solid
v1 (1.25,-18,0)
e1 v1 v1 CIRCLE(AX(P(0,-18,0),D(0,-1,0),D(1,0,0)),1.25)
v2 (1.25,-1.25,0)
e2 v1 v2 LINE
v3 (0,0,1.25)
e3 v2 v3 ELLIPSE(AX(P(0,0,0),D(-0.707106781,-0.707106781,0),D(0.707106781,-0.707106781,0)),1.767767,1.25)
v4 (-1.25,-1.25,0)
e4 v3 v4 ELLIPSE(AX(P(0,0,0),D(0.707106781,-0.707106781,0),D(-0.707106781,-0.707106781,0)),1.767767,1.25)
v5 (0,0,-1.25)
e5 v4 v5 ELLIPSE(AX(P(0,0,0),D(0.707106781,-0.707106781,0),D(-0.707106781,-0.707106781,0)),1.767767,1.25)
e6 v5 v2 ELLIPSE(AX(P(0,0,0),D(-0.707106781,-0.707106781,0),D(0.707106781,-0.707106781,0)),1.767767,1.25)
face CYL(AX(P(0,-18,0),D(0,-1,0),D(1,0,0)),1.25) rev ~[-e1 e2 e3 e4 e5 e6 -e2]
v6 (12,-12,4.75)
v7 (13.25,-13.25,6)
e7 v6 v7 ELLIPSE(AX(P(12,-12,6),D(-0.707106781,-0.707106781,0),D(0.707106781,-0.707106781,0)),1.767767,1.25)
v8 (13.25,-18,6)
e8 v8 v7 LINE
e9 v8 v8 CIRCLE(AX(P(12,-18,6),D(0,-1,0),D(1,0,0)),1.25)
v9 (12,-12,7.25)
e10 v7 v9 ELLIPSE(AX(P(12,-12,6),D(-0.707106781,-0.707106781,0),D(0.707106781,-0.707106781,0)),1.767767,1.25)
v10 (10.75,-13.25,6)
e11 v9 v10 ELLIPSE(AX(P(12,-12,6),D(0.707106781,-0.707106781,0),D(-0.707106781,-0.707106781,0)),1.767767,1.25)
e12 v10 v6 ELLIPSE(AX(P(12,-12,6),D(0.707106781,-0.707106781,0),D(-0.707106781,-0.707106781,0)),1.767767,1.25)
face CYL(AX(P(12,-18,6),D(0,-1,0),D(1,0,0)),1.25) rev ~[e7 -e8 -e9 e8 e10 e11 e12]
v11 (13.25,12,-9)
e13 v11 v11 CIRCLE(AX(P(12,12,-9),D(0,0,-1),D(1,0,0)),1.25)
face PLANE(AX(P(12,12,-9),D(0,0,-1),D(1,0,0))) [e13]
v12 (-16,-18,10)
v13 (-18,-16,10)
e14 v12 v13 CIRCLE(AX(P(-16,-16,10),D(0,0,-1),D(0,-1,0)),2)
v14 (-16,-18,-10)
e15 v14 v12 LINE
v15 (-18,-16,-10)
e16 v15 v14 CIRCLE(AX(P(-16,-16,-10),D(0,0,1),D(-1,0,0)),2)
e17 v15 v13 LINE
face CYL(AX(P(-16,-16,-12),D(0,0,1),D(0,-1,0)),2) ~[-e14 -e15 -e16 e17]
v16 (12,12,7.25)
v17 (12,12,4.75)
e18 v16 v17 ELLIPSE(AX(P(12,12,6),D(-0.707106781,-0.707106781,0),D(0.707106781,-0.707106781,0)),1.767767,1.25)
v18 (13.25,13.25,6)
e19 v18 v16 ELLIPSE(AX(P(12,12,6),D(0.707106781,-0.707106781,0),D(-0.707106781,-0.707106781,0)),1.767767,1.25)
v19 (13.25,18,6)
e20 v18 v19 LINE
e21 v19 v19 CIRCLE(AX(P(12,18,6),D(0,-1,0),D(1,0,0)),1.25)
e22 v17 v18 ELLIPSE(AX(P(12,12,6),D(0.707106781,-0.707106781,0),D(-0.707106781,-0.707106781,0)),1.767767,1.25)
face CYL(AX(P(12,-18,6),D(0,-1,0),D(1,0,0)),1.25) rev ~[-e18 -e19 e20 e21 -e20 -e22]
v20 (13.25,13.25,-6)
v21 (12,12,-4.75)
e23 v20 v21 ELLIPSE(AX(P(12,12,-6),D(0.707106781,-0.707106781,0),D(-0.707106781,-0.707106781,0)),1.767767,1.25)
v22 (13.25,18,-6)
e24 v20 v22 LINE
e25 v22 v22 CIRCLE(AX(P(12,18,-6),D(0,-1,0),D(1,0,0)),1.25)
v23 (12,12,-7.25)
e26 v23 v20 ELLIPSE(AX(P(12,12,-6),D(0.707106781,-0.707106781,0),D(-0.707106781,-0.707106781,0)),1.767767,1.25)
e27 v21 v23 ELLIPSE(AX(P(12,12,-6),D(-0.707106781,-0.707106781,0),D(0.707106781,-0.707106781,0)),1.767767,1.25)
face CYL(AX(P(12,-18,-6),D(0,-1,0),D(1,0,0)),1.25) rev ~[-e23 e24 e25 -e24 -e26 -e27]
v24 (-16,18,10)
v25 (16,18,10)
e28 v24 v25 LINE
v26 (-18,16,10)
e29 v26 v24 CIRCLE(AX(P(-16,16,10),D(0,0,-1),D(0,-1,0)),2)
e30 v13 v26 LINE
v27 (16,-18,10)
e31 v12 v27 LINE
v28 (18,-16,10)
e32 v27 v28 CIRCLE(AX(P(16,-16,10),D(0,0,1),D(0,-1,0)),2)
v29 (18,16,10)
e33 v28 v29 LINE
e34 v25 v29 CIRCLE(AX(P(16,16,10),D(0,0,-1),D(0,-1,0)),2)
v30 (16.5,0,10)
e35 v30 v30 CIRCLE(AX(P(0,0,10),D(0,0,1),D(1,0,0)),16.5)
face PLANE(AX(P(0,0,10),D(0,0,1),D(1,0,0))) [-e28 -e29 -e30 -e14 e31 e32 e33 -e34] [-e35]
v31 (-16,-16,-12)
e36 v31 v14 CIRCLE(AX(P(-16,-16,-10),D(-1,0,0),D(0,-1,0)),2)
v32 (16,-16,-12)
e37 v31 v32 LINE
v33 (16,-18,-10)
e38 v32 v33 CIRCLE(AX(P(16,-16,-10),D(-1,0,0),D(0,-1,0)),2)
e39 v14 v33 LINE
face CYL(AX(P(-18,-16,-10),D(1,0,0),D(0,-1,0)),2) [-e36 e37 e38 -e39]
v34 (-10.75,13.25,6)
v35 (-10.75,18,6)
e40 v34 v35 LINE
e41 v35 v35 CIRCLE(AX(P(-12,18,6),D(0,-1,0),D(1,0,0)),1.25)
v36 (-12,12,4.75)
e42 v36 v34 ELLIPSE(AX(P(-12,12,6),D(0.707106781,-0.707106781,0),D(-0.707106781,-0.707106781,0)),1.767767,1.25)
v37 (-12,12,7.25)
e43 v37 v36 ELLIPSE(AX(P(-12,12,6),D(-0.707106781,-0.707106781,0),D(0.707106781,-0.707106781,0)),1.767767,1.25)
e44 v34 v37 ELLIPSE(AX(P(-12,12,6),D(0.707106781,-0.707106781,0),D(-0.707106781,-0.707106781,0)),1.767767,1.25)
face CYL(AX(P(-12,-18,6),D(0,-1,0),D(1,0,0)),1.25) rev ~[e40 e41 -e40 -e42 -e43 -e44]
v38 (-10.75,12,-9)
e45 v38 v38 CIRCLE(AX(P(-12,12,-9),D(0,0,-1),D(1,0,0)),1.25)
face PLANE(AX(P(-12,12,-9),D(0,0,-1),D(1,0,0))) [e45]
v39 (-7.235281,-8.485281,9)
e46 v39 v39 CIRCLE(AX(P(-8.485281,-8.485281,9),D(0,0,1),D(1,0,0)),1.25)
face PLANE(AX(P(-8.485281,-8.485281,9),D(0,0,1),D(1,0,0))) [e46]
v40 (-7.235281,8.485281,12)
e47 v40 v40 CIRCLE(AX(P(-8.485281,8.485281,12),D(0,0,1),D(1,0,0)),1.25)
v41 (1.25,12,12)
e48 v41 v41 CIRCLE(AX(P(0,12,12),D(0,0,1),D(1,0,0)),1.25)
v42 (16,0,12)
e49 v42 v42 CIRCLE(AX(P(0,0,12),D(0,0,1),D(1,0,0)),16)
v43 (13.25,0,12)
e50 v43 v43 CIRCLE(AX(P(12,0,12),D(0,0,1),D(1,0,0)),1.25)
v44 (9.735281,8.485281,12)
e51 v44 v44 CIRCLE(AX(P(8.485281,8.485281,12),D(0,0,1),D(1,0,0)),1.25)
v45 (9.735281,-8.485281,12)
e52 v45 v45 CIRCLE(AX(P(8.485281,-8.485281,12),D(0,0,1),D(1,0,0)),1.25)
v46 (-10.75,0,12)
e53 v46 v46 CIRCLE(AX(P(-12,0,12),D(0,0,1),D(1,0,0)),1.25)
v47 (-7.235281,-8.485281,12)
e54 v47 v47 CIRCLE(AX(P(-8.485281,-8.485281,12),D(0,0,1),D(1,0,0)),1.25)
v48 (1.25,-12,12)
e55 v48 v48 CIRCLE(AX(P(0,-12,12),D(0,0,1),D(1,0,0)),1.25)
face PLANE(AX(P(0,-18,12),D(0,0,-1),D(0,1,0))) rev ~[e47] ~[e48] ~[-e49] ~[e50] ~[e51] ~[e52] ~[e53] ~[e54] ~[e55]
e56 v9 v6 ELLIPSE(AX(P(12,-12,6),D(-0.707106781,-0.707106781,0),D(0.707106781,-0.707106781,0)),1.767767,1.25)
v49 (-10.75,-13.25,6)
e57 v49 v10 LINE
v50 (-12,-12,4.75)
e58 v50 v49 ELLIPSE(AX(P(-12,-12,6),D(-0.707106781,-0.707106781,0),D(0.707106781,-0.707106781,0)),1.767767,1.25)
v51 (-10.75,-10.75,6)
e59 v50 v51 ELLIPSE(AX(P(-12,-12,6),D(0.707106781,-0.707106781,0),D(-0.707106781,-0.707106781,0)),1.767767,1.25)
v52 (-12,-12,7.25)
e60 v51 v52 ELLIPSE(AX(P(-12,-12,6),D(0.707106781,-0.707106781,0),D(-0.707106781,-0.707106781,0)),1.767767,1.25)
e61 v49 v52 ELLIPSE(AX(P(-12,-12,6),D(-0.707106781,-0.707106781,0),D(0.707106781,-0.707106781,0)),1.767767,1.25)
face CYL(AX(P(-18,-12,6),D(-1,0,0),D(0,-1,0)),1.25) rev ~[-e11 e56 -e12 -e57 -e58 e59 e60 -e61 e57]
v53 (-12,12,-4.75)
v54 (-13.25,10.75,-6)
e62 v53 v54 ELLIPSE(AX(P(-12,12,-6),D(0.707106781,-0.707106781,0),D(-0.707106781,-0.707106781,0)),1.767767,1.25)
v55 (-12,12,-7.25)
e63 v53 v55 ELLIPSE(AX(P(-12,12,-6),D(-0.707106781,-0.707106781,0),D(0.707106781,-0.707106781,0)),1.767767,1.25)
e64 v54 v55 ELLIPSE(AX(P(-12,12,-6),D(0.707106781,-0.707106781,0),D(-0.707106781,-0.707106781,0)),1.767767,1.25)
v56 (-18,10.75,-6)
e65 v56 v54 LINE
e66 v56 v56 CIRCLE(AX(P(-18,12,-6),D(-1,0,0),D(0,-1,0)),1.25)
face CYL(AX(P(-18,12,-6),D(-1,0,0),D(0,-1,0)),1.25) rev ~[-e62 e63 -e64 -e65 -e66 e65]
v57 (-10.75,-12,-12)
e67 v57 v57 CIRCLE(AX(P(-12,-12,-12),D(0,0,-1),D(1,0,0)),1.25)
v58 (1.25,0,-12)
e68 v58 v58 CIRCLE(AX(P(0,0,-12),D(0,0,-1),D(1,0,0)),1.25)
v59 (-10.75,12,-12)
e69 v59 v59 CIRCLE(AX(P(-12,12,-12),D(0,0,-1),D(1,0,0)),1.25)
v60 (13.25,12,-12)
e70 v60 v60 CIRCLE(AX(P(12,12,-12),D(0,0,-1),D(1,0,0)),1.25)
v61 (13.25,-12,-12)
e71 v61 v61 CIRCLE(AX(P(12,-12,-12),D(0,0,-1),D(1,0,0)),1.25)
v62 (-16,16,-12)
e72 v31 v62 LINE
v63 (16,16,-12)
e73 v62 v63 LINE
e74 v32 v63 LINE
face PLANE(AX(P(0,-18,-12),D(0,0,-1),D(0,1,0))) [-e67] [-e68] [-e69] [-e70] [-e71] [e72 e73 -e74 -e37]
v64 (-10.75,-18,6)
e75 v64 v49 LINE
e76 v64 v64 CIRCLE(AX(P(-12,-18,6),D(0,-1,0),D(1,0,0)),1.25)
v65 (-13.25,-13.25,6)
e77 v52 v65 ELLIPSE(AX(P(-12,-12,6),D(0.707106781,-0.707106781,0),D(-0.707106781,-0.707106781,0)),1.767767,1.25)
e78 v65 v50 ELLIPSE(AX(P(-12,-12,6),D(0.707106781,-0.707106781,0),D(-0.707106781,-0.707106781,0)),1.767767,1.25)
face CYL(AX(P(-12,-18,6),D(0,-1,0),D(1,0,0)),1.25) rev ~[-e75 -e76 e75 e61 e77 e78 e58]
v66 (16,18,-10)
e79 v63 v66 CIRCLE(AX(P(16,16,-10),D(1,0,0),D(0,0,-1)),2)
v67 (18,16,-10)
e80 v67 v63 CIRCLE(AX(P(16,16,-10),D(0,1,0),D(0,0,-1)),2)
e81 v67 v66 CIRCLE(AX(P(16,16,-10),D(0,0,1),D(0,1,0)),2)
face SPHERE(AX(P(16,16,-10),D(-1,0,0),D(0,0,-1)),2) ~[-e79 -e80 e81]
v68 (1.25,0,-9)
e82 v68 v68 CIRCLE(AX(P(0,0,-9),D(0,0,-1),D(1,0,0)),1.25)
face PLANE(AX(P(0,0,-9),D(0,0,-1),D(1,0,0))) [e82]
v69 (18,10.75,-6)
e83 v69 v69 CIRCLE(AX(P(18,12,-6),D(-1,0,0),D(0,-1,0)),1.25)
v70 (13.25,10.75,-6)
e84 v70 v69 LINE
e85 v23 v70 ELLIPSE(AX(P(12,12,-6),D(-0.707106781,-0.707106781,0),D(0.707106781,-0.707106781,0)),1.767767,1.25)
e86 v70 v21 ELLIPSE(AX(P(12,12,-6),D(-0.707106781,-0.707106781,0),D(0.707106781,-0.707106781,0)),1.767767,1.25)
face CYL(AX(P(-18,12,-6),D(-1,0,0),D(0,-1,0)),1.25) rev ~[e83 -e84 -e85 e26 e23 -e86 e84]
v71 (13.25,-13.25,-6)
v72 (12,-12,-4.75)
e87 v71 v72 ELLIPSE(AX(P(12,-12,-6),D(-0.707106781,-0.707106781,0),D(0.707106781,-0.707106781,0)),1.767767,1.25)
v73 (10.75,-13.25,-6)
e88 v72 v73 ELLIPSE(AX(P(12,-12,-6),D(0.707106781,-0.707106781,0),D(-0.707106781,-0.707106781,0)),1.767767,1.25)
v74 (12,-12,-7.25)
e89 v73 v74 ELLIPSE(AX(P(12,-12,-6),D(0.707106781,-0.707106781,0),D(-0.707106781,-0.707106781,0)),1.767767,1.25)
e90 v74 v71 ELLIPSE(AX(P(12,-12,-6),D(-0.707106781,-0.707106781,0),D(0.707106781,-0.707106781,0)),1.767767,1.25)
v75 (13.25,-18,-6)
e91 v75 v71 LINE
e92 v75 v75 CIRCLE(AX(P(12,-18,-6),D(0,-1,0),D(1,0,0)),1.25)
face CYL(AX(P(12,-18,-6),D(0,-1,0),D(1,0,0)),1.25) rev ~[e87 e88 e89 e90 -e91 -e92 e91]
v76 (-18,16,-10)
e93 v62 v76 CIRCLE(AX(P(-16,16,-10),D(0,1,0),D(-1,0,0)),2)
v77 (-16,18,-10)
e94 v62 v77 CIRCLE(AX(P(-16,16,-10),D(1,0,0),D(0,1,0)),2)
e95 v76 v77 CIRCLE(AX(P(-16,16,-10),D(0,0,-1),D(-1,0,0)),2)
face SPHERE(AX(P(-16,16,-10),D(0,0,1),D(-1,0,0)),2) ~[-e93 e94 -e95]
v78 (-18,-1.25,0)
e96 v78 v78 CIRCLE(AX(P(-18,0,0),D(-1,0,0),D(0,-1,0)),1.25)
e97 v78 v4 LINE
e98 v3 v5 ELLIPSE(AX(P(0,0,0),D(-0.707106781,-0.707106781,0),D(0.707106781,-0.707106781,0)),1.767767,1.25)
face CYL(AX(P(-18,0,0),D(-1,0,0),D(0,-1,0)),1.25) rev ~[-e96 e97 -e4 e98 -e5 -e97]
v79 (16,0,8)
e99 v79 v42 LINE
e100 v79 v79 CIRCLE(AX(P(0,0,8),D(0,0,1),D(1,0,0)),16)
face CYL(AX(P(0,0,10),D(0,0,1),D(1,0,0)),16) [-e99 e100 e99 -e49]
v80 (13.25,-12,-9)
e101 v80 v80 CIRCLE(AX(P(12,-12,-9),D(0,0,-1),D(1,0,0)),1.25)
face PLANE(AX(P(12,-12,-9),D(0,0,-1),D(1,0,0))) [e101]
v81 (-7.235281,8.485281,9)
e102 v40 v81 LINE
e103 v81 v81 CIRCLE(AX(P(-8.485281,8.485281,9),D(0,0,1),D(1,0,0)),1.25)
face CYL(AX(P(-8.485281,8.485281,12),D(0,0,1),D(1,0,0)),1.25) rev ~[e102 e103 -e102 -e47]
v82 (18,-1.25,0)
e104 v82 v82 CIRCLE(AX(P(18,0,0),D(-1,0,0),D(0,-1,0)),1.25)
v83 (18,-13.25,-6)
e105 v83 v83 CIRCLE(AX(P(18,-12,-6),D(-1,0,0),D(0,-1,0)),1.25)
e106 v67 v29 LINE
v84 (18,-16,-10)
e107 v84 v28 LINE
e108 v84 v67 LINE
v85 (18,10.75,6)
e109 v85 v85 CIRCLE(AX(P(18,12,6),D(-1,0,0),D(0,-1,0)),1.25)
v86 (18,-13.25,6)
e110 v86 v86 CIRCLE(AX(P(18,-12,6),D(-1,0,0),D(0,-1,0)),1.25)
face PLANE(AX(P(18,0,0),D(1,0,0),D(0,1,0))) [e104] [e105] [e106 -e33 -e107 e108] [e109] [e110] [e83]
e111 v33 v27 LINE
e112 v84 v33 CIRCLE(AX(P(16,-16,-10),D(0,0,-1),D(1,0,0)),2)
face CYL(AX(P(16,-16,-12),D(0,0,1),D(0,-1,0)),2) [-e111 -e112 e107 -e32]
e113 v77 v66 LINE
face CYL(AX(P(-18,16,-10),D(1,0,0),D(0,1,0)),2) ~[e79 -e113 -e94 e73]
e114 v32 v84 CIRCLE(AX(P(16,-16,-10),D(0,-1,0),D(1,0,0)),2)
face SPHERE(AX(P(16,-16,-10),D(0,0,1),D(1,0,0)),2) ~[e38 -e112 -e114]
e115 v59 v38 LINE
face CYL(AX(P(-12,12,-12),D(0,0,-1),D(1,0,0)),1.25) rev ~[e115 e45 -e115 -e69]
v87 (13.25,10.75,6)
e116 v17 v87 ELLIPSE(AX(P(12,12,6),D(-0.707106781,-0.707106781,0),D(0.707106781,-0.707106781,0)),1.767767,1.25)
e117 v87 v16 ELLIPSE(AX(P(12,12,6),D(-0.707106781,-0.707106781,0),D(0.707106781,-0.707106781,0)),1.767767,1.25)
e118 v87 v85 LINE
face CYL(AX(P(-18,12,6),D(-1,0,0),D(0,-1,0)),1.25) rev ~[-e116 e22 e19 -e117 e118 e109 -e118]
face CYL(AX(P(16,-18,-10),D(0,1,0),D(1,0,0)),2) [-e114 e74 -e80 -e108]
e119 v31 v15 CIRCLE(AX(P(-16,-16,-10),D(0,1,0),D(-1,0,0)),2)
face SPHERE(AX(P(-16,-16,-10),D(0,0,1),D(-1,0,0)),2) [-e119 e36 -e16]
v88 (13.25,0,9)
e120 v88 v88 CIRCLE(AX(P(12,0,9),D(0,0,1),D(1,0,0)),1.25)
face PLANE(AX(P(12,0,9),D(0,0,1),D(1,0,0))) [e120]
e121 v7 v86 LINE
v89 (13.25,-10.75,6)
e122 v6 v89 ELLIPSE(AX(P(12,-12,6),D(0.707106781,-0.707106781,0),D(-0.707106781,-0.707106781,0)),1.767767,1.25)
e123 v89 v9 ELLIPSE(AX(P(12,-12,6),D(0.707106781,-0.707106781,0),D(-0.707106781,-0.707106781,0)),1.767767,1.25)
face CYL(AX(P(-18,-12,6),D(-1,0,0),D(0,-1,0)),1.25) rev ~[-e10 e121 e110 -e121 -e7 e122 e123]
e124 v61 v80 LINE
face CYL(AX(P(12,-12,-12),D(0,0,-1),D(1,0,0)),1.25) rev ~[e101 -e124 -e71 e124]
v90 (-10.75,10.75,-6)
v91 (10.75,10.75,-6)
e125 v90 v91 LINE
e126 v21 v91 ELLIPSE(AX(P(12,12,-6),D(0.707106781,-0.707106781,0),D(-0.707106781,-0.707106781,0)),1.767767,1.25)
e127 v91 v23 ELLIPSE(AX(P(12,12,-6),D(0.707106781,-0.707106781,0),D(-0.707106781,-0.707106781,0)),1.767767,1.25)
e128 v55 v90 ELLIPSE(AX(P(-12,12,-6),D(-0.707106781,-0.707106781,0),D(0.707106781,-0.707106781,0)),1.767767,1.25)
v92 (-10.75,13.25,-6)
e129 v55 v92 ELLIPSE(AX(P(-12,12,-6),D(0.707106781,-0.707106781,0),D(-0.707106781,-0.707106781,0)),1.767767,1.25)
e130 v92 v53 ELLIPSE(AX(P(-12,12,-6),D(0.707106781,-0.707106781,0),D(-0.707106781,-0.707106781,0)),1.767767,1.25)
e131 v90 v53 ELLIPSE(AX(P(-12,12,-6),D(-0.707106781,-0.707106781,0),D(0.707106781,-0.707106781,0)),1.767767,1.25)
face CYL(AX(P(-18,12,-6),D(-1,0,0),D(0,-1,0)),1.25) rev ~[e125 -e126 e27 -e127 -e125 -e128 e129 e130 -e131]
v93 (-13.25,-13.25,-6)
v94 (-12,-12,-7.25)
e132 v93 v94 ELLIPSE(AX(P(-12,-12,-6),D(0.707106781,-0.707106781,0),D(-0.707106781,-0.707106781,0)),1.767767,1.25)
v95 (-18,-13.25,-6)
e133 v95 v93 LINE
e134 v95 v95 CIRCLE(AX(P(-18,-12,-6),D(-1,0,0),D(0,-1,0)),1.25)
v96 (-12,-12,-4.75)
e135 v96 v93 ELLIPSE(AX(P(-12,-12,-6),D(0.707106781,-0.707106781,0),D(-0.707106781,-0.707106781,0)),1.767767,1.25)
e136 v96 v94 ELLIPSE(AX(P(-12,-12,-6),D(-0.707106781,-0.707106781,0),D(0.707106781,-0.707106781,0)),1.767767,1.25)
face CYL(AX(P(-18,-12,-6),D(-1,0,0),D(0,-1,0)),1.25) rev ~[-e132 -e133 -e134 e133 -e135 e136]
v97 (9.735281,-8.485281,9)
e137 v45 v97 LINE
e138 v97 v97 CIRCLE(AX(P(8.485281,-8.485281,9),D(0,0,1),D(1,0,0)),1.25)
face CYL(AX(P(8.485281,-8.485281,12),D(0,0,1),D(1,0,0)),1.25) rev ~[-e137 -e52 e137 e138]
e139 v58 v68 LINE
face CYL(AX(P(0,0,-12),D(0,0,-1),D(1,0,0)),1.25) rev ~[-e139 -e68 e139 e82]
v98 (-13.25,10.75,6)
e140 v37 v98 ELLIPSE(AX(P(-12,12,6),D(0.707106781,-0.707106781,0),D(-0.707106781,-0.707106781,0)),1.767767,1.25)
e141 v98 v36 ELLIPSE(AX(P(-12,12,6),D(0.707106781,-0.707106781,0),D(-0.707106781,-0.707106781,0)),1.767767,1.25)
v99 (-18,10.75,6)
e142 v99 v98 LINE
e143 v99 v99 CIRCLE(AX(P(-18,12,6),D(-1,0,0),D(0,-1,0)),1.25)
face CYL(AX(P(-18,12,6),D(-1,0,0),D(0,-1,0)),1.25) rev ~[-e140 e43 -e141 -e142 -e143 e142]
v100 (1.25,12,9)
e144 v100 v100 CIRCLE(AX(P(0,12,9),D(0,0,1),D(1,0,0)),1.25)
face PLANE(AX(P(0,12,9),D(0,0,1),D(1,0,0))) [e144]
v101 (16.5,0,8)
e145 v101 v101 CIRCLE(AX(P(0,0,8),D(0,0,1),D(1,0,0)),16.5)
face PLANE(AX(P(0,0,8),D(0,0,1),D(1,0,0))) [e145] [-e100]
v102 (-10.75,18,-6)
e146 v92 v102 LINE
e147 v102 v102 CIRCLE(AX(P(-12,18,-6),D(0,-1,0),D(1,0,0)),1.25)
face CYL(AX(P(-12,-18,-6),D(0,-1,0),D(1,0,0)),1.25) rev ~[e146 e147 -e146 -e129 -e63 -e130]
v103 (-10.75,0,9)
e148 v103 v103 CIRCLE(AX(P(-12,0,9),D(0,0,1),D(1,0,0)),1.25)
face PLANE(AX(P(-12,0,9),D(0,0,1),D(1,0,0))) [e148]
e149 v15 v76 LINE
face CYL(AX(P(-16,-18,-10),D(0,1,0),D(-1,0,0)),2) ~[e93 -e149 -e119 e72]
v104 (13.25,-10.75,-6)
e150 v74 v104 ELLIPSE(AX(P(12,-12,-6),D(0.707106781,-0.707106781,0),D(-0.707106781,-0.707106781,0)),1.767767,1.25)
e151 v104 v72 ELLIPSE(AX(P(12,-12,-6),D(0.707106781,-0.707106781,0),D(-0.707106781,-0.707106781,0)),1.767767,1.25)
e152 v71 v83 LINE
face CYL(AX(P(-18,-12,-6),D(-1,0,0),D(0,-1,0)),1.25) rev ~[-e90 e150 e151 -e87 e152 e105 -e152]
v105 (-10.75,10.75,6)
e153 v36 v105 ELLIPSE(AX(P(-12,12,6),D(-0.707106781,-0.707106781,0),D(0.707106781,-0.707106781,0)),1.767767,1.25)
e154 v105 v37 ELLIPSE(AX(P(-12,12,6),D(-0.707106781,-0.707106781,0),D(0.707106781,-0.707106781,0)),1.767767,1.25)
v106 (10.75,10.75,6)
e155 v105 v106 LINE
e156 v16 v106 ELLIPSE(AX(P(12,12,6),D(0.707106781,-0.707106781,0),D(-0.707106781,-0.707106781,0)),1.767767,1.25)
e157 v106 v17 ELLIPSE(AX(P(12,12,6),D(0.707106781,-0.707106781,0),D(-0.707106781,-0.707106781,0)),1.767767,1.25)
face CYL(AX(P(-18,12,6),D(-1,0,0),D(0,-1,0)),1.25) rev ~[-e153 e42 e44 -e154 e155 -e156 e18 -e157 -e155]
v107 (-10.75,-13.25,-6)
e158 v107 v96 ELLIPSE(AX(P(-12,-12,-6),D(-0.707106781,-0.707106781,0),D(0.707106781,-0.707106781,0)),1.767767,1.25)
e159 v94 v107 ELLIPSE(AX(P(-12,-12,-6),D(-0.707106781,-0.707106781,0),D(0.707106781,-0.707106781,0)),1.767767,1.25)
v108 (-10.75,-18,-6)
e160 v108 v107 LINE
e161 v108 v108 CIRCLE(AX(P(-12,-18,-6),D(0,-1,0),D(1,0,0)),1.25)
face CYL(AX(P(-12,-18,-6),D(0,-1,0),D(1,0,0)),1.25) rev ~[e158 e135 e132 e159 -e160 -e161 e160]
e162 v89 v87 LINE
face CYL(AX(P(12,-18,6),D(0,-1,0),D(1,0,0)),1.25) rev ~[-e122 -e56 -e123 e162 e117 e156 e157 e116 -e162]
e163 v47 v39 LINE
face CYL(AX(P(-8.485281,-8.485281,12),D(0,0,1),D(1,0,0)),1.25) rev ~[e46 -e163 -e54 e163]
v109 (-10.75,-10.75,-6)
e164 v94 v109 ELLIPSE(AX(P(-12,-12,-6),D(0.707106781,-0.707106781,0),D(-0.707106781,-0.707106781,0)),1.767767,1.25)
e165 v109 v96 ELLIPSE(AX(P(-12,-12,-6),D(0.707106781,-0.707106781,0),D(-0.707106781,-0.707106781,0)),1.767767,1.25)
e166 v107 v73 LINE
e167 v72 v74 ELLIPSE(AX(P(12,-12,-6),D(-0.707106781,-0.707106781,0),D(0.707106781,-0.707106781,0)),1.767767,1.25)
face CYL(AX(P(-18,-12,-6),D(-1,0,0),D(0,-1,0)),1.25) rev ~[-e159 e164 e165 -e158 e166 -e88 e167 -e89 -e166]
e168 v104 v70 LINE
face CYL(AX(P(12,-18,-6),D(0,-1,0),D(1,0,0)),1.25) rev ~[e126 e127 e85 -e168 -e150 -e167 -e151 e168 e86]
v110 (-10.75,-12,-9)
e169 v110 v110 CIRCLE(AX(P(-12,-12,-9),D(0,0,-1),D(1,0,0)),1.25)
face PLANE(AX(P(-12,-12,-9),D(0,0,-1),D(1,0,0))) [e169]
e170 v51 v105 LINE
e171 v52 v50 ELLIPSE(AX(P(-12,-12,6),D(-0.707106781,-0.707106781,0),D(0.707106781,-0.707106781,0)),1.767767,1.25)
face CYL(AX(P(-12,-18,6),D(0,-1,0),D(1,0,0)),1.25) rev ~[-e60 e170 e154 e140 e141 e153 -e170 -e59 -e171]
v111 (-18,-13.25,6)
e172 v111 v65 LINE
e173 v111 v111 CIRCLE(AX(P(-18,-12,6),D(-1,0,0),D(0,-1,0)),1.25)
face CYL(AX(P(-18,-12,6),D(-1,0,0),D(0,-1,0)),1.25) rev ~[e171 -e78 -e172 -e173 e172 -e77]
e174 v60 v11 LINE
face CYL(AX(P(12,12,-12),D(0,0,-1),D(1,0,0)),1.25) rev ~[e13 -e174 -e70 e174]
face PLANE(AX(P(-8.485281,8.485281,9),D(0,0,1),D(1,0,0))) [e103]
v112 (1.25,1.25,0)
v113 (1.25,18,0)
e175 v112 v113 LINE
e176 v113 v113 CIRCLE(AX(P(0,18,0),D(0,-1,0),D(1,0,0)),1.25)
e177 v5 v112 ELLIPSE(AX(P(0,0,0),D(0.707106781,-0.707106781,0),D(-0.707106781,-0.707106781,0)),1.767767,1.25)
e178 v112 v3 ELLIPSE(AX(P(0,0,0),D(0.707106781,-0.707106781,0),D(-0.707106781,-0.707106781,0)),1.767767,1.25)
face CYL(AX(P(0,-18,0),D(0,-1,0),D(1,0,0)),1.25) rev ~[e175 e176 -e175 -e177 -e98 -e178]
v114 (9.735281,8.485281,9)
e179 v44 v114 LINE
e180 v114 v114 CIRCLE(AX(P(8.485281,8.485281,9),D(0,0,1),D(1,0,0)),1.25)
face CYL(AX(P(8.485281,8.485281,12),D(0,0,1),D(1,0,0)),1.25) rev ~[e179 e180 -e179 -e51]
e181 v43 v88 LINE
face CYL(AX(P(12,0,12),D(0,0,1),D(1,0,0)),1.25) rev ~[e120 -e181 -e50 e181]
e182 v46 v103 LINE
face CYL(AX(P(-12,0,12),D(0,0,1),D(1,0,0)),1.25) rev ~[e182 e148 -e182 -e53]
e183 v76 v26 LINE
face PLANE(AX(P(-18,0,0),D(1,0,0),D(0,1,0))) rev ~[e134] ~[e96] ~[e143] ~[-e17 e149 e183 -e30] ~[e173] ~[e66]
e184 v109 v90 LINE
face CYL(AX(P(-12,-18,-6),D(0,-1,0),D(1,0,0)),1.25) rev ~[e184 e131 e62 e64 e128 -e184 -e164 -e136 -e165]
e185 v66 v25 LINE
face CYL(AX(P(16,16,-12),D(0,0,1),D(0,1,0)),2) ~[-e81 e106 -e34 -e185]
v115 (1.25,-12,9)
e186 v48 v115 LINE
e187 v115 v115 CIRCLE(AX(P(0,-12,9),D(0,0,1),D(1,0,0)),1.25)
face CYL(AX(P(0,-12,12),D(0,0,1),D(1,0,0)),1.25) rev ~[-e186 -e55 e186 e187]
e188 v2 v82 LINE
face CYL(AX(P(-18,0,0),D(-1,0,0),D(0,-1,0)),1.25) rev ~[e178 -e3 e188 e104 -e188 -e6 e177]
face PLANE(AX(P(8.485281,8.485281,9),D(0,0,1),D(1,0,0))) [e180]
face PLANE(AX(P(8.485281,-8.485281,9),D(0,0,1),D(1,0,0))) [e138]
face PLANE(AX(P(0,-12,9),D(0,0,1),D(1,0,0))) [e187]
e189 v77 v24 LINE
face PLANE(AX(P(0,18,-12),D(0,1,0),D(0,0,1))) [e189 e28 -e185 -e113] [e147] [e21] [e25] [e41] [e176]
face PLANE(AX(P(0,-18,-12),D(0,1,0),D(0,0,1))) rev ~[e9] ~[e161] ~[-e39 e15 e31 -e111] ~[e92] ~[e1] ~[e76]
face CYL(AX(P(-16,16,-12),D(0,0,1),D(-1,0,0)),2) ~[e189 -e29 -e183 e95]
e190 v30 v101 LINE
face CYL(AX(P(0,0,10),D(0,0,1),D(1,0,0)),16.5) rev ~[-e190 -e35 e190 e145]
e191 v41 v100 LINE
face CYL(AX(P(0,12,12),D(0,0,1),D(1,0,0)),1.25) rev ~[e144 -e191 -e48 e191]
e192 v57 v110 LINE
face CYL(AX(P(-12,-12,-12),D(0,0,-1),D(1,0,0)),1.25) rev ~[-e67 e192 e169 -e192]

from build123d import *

# Parameters (mm, degrees)
F0_W      = 36
F0_H      = 24
F1_DEPTH  = 18
F5_W      = 36
F5_H      = 36
F5_R      = 16
F6_DEPTH  = 2
F8_R      = 16.5
F8_R_2    = 16
F9_DEPTH  = 2
F10_R     = 2
F2_R      = 1.25
F13_DEPTH = 36.001
F3_R      = 1.25
F14_DEPTH = 36.001
F4_R      = 1.25
F15_DEPTH = 3
F7_R      = 1.25
F16_DEPTH = 3


# Not quite as in the source:
# - a feature of the source that left no trace in its solid (it failed there, or was rolled back) is left out


with BuildPart() as f1:
    # F0 (on Right) → F1 (new body, symmetric)
    with BuildSketch(Plane.YZ):
        Rectangle(F0_W, F0_H)
    extrude(amount=F1_DEPTH, both=True)

    # F5 (on face) → F6 (cut)
    with BuildSketch(Plane.XY.offset(12)):
        Rectangle(F5_W, F5_H)
        Circle(F5_R, mode=Mode.SUBTRACT)
    extrude(amount=-F6_DEPTH, mode=Mode.SUBTRACT)

    # F8 (on face) → F9 (cut)
    with BuildSketch(Plane.XY.offset(10)):
        Circle(F8_R)
        Circle(F8_R_2, mode=Mode.SUBTRACT)
    extrude(amount=-F9_DEPTH, mode=Mode.SUBTRACT)

    # F10
    f10_edges = [f1.edges().sort_by_distance(p)[0] for p in [
        (-18, -18, -1),
        (-18, 18, -1),
        (18, -18, -1),
        (-18, 0, -12),
        (0, 18, -12),
        (18, 0, -12),
        (0, -18, -12),
        (18, 18, -1),
    ]]
    fillet(f10_edges, radius=F10_R)

    # F2 (on face) → F13 (cut, through all)
    with BuildSketch(Plane.XZ.offset(18)):
        with Locations((-12, 6)):
            Circle(F2_R)
        with Locations((12, 6)):
            Circle(F2_R)
        Circle(F2_R)
        with Locations((-12, -6)):
            Circle(F2_R)
        with Locations((12, -6)):
            Circle(F2_R)
    extrude(amount=-F13_DEPTH, mode=Mode.SUBTRACT)

    # F3 (on face) → F14 (cut, through all)
    with BuildSketch(Plane(origin=(-18, 0, 0), x_dir=(0, -1, 0), z_dir=(-1, 0, 0))):
        with Locations((-12, 6)):
            Circle(F3_R)
        with Locations((-12, -6)):
            Circle(F3_R)
        Circle(F3_R)
        with Locations((12, -6)):
            Circle(F3_R)
        with Locations((12, 6)):
            Circle(F3_R)
    extrude(amount=-F14_DEPTH, mode=Mode.SUBTRACT)

    # F4 (on face) → F15 (cut)
    with BuildSketch(Plane.XY.offset(12)):
        with Locations((12, 0)):
            Circle(F4_R)
        with Locations((8.4852813742, 8.4852813742)):
            Circle(F4_R)
        with Locations((0, 12)):
            Circle(F4_R)
        with Locations((-8.4852813742, 8.4852813742)):
            Circle(F4_R)
        with Locations((-12, 0)):
            Circle(F4_R)
        with Locations((-8.4852813742, -8.4852813742)):
            Circle(F4_R)
        with Locations((0, -12)):
            Circle(F4_R)
        with Locations((8.4852813742, -8.4852813742)):
            Circle(F4_R)
    extrude(amount=-F15_DEPTH, mode=Mode.SUBTRACT)

    # F7 (on face) → F16 (cut)
    with BuildSketch(Plane(origin=(0, 0, -12), x_dir=(1, 0, 0), z_dir=(0, 0, -1))):
        with Locations((-12, -12)):
            Circle(F7_R)
        with Locations((-12, 12)):
            Circle(F7_R)
        Circle(F7_R)
        with Locations((12, -12)):
            Circle(F7_R)
        with Locations((12, 12)):
            Circle(F7_R)
    extrude(amount=-F16_DEPTH, mode=Mode.SUBTRACT)


solid = f1.part
